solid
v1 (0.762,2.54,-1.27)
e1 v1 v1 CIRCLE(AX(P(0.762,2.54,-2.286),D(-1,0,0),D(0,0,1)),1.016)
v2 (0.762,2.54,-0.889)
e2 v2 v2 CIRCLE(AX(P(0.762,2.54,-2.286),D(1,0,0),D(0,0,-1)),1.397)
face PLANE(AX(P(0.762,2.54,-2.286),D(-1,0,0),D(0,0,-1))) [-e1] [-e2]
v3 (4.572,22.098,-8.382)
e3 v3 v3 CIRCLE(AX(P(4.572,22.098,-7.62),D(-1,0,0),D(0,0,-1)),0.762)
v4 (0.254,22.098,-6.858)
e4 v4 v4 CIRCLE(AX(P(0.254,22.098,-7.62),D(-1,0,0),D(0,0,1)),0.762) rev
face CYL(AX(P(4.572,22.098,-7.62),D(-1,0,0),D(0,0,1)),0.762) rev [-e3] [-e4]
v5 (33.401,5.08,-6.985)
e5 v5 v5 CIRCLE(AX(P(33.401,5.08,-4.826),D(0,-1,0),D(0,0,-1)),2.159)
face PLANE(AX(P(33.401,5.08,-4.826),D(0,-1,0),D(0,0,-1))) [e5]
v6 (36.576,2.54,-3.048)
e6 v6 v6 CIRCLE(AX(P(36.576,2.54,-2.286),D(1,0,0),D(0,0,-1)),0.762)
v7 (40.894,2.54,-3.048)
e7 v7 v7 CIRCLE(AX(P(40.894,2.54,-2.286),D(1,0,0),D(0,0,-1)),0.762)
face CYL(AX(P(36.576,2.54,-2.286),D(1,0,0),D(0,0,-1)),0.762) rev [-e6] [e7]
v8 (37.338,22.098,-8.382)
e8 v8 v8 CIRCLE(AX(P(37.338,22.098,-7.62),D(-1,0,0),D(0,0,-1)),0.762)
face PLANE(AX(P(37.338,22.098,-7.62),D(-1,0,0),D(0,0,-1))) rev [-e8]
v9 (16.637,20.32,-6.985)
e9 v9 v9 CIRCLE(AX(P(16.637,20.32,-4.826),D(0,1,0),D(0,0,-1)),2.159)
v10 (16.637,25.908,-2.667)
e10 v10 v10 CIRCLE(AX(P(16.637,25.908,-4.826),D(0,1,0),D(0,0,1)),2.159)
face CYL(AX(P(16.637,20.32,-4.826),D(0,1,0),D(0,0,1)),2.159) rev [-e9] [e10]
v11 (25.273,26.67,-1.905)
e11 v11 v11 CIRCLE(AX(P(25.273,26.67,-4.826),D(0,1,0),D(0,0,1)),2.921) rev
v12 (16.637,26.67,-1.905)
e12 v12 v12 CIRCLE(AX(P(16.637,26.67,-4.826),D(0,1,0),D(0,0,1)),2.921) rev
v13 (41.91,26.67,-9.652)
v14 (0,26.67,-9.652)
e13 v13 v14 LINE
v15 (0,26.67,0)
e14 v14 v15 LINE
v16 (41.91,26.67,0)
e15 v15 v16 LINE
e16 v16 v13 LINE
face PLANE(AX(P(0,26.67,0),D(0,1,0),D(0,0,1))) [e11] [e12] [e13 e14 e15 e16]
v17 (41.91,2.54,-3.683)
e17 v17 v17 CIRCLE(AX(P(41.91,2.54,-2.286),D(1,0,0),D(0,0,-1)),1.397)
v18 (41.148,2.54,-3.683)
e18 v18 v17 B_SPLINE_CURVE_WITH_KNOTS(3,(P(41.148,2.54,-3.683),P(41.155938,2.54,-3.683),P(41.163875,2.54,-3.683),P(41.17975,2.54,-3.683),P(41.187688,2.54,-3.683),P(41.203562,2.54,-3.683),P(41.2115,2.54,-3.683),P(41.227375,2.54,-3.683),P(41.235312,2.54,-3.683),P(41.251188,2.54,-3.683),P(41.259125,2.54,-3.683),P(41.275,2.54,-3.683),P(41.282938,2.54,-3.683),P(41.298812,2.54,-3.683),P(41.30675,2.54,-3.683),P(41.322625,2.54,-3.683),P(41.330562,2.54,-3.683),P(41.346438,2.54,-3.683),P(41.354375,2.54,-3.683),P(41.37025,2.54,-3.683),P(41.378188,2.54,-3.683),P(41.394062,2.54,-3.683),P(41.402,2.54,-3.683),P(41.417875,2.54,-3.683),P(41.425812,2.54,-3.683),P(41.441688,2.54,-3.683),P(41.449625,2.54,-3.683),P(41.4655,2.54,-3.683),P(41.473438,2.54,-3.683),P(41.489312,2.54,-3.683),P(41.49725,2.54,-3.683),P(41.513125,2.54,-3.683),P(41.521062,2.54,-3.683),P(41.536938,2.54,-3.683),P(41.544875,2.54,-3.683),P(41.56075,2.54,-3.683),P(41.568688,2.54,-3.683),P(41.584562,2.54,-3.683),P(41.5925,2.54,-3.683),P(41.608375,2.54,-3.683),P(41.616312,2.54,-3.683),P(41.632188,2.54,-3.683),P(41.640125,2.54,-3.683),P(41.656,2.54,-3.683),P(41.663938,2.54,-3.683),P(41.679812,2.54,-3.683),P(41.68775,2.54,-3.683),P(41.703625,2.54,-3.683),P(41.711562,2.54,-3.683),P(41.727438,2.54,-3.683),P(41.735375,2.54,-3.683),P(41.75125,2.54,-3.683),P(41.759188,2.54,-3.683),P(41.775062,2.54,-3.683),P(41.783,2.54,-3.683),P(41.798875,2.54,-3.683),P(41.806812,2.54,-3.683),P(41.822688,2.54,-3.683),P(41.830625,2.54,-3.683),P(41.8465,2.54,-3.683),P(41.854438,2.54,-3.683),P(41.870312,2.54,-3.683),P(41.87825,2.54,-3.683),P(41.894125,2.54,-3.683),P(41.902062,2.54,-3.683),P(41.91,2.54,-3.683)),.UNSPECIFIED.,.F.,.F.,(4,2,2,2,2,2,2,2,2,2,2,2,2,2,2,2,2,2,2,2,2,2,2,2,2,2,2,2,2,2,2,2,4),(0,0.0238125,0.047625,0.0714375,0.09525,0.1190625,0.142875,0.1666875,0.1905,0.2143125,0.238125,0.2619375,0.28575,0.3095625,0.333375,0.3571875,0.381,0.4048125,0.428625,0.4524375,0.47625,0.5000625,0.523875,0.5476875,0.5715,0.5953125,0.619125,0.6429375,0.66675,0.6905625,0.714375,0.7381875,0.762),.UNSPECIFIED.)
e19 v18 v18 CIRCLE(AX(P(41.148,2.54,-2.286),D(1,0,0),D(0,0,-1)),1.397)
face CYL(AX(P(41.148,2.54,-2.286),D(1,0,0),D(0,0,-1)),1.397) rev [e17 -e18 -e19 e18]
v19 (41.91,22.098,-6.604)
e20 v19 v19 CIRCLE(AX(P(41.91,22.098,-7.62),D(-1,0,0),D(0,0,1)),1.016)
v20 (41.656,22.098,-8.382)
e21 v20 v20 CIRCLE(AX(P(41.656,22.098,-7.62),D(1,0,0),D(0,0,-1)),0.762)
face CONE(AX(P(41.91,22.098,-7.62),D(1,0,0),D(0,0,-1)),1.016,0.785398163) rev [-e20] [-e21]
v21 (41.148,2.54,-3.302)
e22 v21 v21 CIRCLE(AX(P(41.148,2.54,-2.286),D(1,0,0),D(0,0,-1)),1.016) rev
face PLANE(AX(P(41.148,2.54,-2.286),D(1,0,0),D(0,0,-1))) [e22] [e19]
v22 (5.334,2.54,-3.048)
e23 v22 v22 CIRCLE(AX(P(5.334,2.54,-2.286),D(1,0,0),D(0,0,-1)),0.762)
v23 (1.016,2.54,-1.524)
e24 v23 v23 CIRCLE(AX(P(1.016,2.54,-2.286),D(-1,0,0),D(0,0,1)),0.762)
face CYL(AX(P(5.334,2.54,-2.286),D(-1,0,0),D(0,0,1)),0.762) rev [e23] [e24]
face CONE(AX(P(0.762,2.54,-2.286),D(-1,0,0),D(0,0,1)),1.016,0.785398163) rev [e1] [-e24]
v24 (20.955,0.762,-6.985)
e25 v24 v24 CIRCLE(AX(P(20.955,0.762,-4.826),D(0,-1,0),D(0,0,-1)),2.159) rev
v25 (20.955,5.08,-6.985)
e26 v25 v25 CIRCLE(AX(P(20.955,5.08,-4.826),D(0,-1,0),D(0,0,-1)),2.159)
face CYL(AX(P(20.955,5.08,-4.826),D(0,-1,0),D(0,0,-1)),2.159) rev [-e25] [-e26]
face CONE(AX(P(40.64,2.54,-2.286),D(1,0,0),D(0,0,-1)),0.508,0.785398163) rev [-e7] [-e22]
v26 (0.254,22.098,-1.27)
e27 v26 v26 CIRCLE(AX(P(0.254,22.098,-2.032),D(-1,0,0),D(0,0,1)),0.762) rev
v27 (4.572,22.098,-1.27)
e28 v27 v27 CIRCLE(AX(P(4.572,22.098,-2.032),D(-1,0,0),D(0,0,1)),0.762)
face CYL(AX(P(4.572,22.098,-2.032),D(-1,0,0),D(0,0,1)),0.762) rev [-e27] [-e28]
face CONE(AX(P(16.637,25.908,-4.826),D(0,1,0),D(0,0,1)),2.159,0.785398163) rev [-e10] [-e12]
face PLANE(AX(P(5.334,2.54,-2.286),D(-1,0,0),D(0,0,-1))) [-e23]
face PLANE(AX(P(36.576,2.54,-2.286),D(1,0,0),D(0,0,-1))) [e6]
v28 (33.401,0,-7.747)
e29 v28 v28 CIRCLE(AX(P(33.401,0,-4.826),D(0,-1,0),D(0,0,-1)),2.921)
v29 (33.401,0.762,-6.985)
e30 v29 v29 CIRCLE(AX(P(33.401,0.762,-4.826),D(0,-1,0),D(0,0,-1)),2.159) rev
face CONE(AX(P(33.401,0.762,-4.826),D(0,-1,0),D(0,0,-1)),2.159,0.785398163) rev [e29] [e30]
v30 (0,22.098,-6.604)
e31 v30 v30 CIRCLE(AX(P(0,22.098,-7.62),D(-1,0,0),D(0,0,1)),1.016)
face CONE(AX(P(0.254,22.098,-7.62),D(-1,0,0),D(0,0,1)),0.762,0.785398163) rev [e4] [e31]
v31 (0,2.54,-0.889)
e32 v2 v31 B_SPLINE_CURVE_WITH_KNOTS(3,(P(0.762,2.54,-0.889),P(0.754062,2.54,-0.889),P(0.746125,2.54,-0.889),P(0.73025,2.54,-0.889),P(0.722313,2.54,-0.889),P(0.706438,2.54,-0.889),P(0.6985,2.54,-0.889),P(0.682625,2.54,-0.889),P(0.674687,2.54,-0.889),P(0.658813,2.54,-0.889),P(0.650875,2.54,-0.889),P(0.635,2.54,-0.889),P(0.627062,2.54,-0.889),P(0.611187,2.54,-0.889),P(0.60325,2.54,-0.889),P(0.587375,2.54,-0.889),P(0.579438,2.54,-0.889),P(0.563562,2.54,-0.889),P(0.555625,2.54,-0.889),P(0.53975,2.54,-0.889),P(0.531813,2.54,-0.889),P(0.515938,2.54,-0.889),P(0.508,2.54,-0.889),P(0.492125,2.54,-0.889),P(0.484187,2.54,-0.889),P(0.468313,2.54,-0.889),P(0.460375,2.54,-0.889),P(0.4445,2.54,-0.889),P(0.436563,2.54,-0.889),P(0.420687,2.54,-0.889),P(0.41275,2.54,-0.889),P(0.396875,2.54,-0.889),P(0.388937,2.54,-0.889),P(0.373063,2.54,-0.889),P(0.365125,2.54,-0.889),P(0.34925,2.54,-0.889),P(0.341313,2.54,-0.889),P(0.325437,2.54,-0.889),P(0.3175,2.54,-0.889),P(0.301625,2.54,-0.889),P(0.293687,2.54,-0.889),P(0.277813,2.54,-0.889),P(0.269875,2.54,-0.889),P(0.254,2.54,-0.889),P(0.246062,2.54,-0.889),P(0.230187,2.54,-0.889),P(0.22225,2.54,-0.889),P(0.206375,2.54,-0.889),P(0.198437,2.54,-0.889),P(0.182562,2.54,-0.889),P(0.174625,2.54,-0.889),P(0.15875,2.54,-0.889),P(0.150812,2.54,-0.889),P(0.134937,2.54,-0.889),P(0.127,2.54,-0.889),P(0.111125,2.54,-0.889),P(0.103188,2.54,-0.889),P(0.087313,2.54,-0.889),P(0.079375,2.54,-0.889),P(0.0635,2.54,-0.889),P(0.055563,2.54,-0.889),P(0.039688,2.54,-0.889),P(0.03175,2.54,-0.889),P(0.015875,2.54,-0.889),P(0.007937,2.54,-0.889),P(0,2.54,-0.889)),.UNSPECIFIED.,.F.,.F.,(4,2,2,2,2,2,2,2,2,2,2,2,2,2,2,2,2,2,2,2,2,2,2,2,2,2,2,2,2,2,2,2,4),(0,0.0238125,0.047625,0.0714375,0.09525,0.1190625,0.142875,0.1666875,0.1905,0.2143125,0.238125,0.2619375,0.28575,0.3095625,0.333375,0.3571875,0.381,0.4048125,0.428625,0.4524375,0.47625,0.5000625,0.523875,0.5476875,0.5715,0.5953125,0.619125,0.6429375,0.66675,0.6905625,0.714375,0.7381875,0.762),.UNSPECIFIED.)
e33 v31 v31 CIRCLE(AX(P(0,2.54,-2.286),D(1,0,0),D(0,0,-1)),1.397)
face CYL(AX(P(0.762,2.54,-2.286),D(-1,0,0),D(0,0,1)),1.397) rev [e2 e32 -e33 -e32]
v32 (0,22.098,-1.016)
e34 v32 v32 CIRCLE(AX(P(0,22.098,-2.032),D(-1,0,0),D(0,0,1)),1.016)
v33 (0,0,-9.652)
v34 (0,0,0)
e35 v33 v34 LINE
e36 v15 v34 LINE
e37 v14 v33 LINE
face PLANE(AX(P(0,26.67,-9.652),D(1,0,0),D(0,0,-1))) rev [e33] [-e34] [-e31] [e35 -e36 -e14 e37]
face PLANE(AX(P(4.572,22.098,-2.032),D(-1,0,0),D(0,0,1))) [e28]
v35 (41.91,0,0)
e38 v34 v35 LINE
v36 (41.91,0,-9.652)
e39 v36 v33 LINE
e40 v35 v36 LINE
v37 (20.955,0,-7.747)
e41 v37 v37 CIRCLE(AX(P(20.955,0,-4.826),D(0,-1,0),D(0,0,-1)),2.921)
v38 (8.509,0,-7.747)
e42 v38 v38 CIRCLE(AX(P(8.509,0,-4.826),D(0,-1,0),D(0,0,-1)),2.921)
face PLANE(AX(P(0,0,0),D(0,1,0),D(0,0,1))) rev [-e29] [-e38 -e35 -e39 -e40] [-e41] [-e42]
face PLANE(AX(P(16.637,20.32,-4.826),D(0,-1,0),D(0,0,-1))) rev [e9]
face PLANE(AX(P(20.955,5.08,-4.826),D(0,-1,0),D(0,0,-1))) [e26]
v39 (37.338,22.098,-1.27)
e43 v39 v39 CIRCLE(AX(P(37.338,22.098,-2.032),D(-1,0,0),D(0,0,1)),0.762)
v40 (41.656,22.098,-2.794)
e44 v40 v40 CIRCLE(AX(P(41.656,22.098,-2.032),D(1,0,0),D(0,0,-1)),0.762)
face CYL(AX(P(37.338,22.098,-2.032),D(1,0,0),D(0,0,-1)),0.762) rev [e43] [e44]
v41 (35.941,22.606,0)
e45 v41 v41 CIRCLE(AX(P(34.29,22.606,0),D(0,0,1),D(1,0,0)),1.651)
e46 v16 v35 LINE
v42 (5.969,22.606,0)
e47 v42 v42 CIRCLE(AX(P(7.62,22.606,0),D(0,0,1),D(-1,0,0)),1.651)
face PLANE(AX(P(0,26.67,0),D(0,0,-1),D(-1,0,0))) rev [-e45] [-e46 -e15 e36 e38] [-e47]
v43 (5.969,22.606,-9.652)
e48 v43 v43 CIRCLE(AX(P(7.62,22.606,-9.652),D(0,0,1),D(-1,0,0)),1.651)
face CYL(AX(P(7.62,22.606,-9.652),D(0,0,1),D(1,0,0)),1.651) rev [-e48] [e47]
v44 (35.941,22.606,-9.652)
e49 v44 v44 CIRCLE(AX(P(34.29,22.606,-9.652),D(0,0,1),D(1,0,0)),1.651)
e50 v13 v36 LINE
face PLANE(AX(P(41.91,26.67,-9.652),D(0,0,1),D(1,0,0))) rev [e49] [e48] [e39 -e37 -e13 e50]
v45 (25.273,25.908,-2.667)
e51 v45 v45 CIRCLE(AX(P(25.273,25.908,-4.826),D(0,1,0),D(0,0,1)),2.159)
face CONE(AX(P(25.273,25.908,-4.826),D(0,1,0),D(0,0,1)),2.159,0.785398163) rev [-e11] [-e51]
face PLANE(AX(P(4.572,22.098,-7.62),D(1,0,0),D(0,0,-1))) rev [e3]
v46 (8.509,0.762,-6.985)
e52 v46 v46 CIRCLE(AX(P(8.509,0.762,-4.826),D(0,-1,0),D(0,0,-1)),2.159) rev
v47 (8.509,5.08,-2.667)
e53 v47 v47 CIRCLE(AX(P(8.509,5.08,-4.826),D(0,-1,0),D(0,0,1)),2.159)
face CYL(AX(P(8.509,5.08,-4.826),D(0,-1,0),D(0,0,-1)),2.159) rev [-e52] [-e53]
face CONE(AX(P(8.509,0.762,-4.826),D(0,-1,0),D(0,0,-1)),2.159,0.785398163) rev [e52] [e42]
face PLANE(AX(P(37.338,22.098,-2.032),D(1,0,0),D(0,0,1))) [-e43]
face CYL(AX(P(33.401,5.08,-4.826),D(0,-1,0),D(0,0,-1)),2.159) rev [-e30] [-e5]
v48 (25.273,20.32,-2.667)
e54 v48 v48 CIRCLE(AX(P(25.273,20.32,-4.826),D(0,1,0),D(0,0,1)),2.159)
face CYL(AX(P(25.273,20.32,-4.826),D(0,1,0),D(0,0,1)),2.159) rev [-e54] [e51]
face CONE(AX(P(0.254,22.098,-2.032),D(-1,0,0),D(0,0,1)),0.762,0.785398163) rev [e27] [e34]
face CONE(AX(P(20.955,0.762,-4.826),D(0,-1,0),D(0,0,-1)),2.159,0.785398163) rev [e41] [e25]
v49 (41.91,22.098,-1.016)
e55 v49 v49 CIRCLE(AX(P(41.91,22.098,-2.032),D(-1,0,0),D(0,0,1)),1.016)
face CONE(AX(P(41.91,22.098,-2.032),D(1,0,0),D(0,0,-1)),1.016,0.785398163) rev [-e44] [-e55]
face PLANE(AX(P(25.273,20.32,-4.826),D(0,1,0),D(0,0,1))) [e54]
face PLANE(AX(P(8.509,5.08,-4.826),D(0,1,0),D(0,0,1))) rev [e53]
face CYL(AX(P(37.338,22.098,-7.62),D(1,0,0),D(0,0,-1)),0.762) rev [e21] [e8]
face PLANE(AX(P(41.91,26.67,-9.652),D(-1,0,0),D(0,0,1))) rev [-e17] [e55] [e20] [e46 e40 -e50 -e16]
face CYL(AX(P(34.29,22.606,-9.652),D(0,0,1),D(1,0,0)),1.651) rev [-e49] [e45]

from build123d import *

# Parameters (mm, degrees)
SKETCH1_W                = 41.91
SKETCH1_H                = 9.652
BOSS_EXTRUDE1_DEPTH      = 26.67
SKETCH2_R                = 1.651
CUT_EXTRUDE1_DEPTH       = 51.605316954
SKETCH3_R                = 2.159
CUT_EXTRUDE2_DEPTH       = 6.35
CHAMFER5_SIZE            = 0.762
SKETCH5_R                = 2.159
CUT_EXTRUDE4_DEPTH       = 5.08
SKETCH6_R                = 2.921
CUT_EXTRUDE5_DEPTH       = 0.762
CHAMFER2_SIZE            = 0.762
SKETCH7_R                = 0.762
CUT_EXTRUDE6_DEPTH       = 5.334
SKETCH9_R                = 1.016
CUT_EXTRUDE7_DEPTH       = 1.27
SKETCH10_R               = 1.397
CUT_EXTRUDE8_DEPTH       = 0.762
CHAMFER3_SIZE            = 0.508
CHAMFER3_OF_MIRROR2_SIZE = 0.508
SKETCH12_R               = 0.762
CUT_EXTRUDE9_DEPTH       = 4.572
SKETCH14_R               = 1.016
CUT_EXTRUDE10_DEPTH      = 0.254
CHAMFER4_SIZE            = 0.254
CHAMFER4_OF_MIRROR3_SIZE = 0.254


# Some blends are built 0.0001 mm under size
with BuildPart() as part:
    # Sketch1 → Boss-Extrude1 (new body)
    with BuildSketch(Plane(origin=(0, 0, 0), x_dir=(1, 0, 0), z_dir=(0, 1, 0))):
        with Locations((20.955, 4.826)):
            Rectangle(SKETCH1_W, SKETCH1_H)
    extrude(amount=BOSS_EXTRUDE1_DEPTH)

    # Sketch2 → Cut-Extrude1 (cut, through all)
    with BuildSketch(Plane.XY):
        with Locations((34.29, 22.606)):
            Circle(SKETCH2_R)
        with Locations(Location((7.62, 22.606, 0), (0, 0, 180))):
            Circle(SKETCH2_R)
    extrude(amount=-CUT_EXTRUDE1_DEPTH, mode=Mode.SUBTRACT)

    # Sketch3 → Cut-Extrude2 (cut)
    with BuildSketch(Plane(origin=(0, 26.67, 0), x_dir=(1, 0, 0), z_dir=(0, 1, 0))):
        with Locations(Location((25.273, 4.826, 0), (0, 0, 270))):
            Circle(SKETCH3_R)
        with Locations(Location((16.637, 4.826, 0), (0, 0, 90))):
            Circle(SKETCH3_R)
    extrude(amount=-CUT_EXTRUDE2_DEPTH, mode=Mode.SUBTRACT)

    # Chamfer5
    chamfer5_edges = [part.edges().sort_by_distance(p)[0] for p in [
        (25.273, 26.67, -6.985),
        (16.637, 26.67, -2.667),
    ]]
    chamfer(chamfer5_edges, length=CHAMFER5_SIZE)

    # Sketch5 → Cut-Extrude4 (cut)
    with BuildSketch(Plane(origin=(0, 0, 0), x_dir=(-1, 0, 0), z_dir=(0, -1, 0))):
        with Locations(Location((-33.401, 4.826, 0), (0, 0, 90))):
            Circle(SKETCH5_R)
        with Locations(Location((-8.509, 4.826, 0), (0, 0, 270))):
            Circle(SKETCH5_R)
        with Locations(Location((-20.955, 4.826, 0), (0, 0, 90))):
            Circle(SKETCH5_R)
    extrude(amount=-CUT_EXTRUDE4_DEPTH, mode=Mode.SUBTRACT)

    # Sketch6 → Cut-Extrude5 (cut)
    with BuildSketch(Plane(origin=(0, 0, 0), x_dir=(-1, 0, 0), z_dir=(0, -1, 0))):
        with Locations(Location((-33.401, 4.826, 0), (0, 0, 90))):
            Circle(SKETCH6_R)
        with Locations(Location((-20.955, 4.826, 0), (0, 0, 90))):
            Circle(SKETCH6_R)
        with Locations(Location((-8.509, 4.826, 0), (0, 0, 90))):
            Circle(SKETCH6_R)
    extrude(amount=-CUT_EXTRUDE5_DEPTH, mode=Mode.SUBTRACT)

    # Chamfer2
    chamfer2_edges = [part.edges().sort_by_distance(p)[0] for p in [
        (33.401, 0.762, -1.905),
        (20.955, 0.762, -1.905),
        (8.509, 0.762, -1.905),
    ]]
    chamfer(chamfer2_edges, length=CHAMFER2_SIZE - 0.0001)  # a hair under: the kernel refuses the full size

    # Sketch7 → Cut-Extrude6 (cut)
    with BuildSketch(Plane(origin=(41.91, 0, 0), x_dir=(0, 0, -1), z_dir=(1, 0, 0))):
        with Locations((2.286, 2.54)):
            Circle(SKETCH7_R)
    cut_extrude6 = extrude(amount=-CUT_EXTRUDE6_DEPTH, mode=Mode.SUBTRACT)

    # Sketch9 → Cut-Extrude7 (cut)
    with BuildSketch(Plane(origin=(41.91, 0, 0), x_dir=(0, 0, -1), z_dir=(1, 0, 0))):
        with Locations((2.286, 2.54)):
            Circle(SKETCH9_R)
    cut_extrude7 = extrude(amount=-CUT_EXTRUDE7_DEPTH, mode=Mode.SUBTRACT)

    # Sketch10 → Cut-Extrude8 (cut)
    with BuildSketch(Plane(origin=(41.91, 0, 0), x_dir=(0, 0, -1), z_dir=(1, 0, 0))):
        with Locations((2.286, 2.54)):
            Circle(SKETCH10_R)
    cut_extrude8 = extrude(amount=-CUT_EXTRUDE8_DEPTH, mode=Mode.SUBTRACT)

    # Chamfer3
    # the kernel refuses this chamfer: 0.508 mm, written as the material it adds along each edge
    with BuildSketch(Plane(origin=(40.64, 2.54, -2.286), x_dir=(0, 0, -1), z_dir=(0, -1, 0))) as chamfer3_piece_1_section:
        Polygon((1.016, CHAMFER3_SIZE), (1.016 - CHAMFER3_SIZE, 0), (1.016, 0), align=None)
    chamfer3_piece_1 = revolve(axis=Axis((40.64, 2.54, -2.286), (1, 0, 0)), mode=Mode.PRIVATE)
    chamfer3_piece_1 = split(chamfer3_piece_1, bisect_by=Plane(origin=(41.148, 2.54, -1.391029136), z_dir=(-1, 0, 0)), keep=Keep.TOP, mode=Mode.PRIVATE)
    chamfer3_piece_1 = chamfer3_piece_1 - Plane(origin=(41.015029136, 2.54, -2.286), x_dir=(0, 0, -1), z_dir=(1, 0, 0)) * Cylinder(0.762, 5, mode=Mode.PRIVATE)
    add(chamfer3_piece_1)

    # Mirror2: Cut-Extrude6, Cut-Extrude7, Cut-Extrude8 across plane
    add(cut_extrude6.mirror(Plane.ZY.offset(-20.955)), mode=Mode.SUBTRACT)
    add(cut_extrude7.mirror(Plane.ZY.offset(-20.955)), mode=Mode.SUBTRACT)
    add(cut_extrude8.mirror(Plane.ZY.offset(-20.955)), mode=Mode.SUBTRACT)

    # Chamfer3 of Mirror2
    # the kernel refuses this chamfer: 0.508 mm, written as the material it adds along each edge
    with BuildSketch(Plane(origin=(1.27, 2.54, -2.286), x_dir=(0, 0, -1), z_dir=(0, -1, 0))) as chamfer3_of_mirror2_piece_1_section:
        Polygon((1.016, -CHAMFER3_OF_MIRROR2_SIZE), (1.016 - CHAMFER3_OF_MIRROR2_SIZE, 0), (1.016, 0), align=None)
    chamfer3_of_mirror2_piece_1 = revolve(axis=Axis((1.27, 2.54, -2.286), (1, 0, 0)), mode=Mode.PRIVATE)
    chamfer3_of_mirror2_piece_1 = split(chamfer3_of_mirror2_piece_1, bisect_by=Plane(origin=(0.762, 2.54, -1.391029136), z_dir=(1, 0, 0)), keep=Keep.TOP, mode=Mode.PRIVATE)
    chamfer3_of_mirror2_piece_1 = chamfer3_of_mirror2_piece_1 - Plane(origin=(0.894970864, 2.54, -2.286), x_dir=(0, 0, -1), z_dir=(-1, 0, 0)) * Cylinder(0.762, 5, mode=Mode.PRIVATE)
    add(chamfer3_of_mirror2_piece_1)

    # Sketch12 → Cut-Extrude9 (cut)
    with BuildSketch(Plane.ZY):
        with Locations((-2.032, 22.098)):
            Circle(SKETCH12_R)
        with Locations(Location((-7.62, 22.098, 0), (0, 0, 180))):
            Circle(SKETCH12_R)
    cut_extrude9 = extrude(amount=-CUT_EXTRUDE9_DEPTH, mode=Mode.SUBTRACT)

    # Sketch14 → Cut-Extrude10 (cut)
    with BuildSketch(Plane.ZY):
        with Locations((-7.62, 22.098)):
            Circle(SKETCH14_R)
        with Locations((-2.032, 22.098)):
            Circle(SKETCH14_R)
    cut_extrude10 = extrude(amount=-CUT_EXTRUDE10_DEPTH, mode=Mode.SUBTRACT)

    # Chamfer4
    chamfer4_edges = [part.edges().sort_by_distance(p)[0] for p in [
        (0.254, 22.098, -8.636),
        (0.254, 22.098, -3.048),
    ]]
    chamfer(chamfer4_edges, length=CHAMFER4_SIZE - 0.0001)  # a hair under: the kernel refuses the full size

    # Mirror3: Cut-Extrude9, Cut-Extrude10 across plane
    add(cut_extrude9.mirror(Plane.ZY.offset(-20.955)), mode=Mode.SUBTRACT)
    add(cut_extrude10.mirror(Plane.ZY.offset(-20.955)), mode=Mode.SUBTRACT)

    # Chamfer4 of Mirror3
    chamfer4_of_mirror3_edges = [part.edges().sort_by_distance(p)[0] for p in [
        (41.656, 22.098, -8.636),
        (41.656, 22.098, -3.048),
    ]]
    chamfer(chamfer4_of_mirror3_edges, length=CHAMFER4_OF_MIRROR3_SIZE - 0.0001)  # a hair under: the kernel refuses the full size


solid = part.part
